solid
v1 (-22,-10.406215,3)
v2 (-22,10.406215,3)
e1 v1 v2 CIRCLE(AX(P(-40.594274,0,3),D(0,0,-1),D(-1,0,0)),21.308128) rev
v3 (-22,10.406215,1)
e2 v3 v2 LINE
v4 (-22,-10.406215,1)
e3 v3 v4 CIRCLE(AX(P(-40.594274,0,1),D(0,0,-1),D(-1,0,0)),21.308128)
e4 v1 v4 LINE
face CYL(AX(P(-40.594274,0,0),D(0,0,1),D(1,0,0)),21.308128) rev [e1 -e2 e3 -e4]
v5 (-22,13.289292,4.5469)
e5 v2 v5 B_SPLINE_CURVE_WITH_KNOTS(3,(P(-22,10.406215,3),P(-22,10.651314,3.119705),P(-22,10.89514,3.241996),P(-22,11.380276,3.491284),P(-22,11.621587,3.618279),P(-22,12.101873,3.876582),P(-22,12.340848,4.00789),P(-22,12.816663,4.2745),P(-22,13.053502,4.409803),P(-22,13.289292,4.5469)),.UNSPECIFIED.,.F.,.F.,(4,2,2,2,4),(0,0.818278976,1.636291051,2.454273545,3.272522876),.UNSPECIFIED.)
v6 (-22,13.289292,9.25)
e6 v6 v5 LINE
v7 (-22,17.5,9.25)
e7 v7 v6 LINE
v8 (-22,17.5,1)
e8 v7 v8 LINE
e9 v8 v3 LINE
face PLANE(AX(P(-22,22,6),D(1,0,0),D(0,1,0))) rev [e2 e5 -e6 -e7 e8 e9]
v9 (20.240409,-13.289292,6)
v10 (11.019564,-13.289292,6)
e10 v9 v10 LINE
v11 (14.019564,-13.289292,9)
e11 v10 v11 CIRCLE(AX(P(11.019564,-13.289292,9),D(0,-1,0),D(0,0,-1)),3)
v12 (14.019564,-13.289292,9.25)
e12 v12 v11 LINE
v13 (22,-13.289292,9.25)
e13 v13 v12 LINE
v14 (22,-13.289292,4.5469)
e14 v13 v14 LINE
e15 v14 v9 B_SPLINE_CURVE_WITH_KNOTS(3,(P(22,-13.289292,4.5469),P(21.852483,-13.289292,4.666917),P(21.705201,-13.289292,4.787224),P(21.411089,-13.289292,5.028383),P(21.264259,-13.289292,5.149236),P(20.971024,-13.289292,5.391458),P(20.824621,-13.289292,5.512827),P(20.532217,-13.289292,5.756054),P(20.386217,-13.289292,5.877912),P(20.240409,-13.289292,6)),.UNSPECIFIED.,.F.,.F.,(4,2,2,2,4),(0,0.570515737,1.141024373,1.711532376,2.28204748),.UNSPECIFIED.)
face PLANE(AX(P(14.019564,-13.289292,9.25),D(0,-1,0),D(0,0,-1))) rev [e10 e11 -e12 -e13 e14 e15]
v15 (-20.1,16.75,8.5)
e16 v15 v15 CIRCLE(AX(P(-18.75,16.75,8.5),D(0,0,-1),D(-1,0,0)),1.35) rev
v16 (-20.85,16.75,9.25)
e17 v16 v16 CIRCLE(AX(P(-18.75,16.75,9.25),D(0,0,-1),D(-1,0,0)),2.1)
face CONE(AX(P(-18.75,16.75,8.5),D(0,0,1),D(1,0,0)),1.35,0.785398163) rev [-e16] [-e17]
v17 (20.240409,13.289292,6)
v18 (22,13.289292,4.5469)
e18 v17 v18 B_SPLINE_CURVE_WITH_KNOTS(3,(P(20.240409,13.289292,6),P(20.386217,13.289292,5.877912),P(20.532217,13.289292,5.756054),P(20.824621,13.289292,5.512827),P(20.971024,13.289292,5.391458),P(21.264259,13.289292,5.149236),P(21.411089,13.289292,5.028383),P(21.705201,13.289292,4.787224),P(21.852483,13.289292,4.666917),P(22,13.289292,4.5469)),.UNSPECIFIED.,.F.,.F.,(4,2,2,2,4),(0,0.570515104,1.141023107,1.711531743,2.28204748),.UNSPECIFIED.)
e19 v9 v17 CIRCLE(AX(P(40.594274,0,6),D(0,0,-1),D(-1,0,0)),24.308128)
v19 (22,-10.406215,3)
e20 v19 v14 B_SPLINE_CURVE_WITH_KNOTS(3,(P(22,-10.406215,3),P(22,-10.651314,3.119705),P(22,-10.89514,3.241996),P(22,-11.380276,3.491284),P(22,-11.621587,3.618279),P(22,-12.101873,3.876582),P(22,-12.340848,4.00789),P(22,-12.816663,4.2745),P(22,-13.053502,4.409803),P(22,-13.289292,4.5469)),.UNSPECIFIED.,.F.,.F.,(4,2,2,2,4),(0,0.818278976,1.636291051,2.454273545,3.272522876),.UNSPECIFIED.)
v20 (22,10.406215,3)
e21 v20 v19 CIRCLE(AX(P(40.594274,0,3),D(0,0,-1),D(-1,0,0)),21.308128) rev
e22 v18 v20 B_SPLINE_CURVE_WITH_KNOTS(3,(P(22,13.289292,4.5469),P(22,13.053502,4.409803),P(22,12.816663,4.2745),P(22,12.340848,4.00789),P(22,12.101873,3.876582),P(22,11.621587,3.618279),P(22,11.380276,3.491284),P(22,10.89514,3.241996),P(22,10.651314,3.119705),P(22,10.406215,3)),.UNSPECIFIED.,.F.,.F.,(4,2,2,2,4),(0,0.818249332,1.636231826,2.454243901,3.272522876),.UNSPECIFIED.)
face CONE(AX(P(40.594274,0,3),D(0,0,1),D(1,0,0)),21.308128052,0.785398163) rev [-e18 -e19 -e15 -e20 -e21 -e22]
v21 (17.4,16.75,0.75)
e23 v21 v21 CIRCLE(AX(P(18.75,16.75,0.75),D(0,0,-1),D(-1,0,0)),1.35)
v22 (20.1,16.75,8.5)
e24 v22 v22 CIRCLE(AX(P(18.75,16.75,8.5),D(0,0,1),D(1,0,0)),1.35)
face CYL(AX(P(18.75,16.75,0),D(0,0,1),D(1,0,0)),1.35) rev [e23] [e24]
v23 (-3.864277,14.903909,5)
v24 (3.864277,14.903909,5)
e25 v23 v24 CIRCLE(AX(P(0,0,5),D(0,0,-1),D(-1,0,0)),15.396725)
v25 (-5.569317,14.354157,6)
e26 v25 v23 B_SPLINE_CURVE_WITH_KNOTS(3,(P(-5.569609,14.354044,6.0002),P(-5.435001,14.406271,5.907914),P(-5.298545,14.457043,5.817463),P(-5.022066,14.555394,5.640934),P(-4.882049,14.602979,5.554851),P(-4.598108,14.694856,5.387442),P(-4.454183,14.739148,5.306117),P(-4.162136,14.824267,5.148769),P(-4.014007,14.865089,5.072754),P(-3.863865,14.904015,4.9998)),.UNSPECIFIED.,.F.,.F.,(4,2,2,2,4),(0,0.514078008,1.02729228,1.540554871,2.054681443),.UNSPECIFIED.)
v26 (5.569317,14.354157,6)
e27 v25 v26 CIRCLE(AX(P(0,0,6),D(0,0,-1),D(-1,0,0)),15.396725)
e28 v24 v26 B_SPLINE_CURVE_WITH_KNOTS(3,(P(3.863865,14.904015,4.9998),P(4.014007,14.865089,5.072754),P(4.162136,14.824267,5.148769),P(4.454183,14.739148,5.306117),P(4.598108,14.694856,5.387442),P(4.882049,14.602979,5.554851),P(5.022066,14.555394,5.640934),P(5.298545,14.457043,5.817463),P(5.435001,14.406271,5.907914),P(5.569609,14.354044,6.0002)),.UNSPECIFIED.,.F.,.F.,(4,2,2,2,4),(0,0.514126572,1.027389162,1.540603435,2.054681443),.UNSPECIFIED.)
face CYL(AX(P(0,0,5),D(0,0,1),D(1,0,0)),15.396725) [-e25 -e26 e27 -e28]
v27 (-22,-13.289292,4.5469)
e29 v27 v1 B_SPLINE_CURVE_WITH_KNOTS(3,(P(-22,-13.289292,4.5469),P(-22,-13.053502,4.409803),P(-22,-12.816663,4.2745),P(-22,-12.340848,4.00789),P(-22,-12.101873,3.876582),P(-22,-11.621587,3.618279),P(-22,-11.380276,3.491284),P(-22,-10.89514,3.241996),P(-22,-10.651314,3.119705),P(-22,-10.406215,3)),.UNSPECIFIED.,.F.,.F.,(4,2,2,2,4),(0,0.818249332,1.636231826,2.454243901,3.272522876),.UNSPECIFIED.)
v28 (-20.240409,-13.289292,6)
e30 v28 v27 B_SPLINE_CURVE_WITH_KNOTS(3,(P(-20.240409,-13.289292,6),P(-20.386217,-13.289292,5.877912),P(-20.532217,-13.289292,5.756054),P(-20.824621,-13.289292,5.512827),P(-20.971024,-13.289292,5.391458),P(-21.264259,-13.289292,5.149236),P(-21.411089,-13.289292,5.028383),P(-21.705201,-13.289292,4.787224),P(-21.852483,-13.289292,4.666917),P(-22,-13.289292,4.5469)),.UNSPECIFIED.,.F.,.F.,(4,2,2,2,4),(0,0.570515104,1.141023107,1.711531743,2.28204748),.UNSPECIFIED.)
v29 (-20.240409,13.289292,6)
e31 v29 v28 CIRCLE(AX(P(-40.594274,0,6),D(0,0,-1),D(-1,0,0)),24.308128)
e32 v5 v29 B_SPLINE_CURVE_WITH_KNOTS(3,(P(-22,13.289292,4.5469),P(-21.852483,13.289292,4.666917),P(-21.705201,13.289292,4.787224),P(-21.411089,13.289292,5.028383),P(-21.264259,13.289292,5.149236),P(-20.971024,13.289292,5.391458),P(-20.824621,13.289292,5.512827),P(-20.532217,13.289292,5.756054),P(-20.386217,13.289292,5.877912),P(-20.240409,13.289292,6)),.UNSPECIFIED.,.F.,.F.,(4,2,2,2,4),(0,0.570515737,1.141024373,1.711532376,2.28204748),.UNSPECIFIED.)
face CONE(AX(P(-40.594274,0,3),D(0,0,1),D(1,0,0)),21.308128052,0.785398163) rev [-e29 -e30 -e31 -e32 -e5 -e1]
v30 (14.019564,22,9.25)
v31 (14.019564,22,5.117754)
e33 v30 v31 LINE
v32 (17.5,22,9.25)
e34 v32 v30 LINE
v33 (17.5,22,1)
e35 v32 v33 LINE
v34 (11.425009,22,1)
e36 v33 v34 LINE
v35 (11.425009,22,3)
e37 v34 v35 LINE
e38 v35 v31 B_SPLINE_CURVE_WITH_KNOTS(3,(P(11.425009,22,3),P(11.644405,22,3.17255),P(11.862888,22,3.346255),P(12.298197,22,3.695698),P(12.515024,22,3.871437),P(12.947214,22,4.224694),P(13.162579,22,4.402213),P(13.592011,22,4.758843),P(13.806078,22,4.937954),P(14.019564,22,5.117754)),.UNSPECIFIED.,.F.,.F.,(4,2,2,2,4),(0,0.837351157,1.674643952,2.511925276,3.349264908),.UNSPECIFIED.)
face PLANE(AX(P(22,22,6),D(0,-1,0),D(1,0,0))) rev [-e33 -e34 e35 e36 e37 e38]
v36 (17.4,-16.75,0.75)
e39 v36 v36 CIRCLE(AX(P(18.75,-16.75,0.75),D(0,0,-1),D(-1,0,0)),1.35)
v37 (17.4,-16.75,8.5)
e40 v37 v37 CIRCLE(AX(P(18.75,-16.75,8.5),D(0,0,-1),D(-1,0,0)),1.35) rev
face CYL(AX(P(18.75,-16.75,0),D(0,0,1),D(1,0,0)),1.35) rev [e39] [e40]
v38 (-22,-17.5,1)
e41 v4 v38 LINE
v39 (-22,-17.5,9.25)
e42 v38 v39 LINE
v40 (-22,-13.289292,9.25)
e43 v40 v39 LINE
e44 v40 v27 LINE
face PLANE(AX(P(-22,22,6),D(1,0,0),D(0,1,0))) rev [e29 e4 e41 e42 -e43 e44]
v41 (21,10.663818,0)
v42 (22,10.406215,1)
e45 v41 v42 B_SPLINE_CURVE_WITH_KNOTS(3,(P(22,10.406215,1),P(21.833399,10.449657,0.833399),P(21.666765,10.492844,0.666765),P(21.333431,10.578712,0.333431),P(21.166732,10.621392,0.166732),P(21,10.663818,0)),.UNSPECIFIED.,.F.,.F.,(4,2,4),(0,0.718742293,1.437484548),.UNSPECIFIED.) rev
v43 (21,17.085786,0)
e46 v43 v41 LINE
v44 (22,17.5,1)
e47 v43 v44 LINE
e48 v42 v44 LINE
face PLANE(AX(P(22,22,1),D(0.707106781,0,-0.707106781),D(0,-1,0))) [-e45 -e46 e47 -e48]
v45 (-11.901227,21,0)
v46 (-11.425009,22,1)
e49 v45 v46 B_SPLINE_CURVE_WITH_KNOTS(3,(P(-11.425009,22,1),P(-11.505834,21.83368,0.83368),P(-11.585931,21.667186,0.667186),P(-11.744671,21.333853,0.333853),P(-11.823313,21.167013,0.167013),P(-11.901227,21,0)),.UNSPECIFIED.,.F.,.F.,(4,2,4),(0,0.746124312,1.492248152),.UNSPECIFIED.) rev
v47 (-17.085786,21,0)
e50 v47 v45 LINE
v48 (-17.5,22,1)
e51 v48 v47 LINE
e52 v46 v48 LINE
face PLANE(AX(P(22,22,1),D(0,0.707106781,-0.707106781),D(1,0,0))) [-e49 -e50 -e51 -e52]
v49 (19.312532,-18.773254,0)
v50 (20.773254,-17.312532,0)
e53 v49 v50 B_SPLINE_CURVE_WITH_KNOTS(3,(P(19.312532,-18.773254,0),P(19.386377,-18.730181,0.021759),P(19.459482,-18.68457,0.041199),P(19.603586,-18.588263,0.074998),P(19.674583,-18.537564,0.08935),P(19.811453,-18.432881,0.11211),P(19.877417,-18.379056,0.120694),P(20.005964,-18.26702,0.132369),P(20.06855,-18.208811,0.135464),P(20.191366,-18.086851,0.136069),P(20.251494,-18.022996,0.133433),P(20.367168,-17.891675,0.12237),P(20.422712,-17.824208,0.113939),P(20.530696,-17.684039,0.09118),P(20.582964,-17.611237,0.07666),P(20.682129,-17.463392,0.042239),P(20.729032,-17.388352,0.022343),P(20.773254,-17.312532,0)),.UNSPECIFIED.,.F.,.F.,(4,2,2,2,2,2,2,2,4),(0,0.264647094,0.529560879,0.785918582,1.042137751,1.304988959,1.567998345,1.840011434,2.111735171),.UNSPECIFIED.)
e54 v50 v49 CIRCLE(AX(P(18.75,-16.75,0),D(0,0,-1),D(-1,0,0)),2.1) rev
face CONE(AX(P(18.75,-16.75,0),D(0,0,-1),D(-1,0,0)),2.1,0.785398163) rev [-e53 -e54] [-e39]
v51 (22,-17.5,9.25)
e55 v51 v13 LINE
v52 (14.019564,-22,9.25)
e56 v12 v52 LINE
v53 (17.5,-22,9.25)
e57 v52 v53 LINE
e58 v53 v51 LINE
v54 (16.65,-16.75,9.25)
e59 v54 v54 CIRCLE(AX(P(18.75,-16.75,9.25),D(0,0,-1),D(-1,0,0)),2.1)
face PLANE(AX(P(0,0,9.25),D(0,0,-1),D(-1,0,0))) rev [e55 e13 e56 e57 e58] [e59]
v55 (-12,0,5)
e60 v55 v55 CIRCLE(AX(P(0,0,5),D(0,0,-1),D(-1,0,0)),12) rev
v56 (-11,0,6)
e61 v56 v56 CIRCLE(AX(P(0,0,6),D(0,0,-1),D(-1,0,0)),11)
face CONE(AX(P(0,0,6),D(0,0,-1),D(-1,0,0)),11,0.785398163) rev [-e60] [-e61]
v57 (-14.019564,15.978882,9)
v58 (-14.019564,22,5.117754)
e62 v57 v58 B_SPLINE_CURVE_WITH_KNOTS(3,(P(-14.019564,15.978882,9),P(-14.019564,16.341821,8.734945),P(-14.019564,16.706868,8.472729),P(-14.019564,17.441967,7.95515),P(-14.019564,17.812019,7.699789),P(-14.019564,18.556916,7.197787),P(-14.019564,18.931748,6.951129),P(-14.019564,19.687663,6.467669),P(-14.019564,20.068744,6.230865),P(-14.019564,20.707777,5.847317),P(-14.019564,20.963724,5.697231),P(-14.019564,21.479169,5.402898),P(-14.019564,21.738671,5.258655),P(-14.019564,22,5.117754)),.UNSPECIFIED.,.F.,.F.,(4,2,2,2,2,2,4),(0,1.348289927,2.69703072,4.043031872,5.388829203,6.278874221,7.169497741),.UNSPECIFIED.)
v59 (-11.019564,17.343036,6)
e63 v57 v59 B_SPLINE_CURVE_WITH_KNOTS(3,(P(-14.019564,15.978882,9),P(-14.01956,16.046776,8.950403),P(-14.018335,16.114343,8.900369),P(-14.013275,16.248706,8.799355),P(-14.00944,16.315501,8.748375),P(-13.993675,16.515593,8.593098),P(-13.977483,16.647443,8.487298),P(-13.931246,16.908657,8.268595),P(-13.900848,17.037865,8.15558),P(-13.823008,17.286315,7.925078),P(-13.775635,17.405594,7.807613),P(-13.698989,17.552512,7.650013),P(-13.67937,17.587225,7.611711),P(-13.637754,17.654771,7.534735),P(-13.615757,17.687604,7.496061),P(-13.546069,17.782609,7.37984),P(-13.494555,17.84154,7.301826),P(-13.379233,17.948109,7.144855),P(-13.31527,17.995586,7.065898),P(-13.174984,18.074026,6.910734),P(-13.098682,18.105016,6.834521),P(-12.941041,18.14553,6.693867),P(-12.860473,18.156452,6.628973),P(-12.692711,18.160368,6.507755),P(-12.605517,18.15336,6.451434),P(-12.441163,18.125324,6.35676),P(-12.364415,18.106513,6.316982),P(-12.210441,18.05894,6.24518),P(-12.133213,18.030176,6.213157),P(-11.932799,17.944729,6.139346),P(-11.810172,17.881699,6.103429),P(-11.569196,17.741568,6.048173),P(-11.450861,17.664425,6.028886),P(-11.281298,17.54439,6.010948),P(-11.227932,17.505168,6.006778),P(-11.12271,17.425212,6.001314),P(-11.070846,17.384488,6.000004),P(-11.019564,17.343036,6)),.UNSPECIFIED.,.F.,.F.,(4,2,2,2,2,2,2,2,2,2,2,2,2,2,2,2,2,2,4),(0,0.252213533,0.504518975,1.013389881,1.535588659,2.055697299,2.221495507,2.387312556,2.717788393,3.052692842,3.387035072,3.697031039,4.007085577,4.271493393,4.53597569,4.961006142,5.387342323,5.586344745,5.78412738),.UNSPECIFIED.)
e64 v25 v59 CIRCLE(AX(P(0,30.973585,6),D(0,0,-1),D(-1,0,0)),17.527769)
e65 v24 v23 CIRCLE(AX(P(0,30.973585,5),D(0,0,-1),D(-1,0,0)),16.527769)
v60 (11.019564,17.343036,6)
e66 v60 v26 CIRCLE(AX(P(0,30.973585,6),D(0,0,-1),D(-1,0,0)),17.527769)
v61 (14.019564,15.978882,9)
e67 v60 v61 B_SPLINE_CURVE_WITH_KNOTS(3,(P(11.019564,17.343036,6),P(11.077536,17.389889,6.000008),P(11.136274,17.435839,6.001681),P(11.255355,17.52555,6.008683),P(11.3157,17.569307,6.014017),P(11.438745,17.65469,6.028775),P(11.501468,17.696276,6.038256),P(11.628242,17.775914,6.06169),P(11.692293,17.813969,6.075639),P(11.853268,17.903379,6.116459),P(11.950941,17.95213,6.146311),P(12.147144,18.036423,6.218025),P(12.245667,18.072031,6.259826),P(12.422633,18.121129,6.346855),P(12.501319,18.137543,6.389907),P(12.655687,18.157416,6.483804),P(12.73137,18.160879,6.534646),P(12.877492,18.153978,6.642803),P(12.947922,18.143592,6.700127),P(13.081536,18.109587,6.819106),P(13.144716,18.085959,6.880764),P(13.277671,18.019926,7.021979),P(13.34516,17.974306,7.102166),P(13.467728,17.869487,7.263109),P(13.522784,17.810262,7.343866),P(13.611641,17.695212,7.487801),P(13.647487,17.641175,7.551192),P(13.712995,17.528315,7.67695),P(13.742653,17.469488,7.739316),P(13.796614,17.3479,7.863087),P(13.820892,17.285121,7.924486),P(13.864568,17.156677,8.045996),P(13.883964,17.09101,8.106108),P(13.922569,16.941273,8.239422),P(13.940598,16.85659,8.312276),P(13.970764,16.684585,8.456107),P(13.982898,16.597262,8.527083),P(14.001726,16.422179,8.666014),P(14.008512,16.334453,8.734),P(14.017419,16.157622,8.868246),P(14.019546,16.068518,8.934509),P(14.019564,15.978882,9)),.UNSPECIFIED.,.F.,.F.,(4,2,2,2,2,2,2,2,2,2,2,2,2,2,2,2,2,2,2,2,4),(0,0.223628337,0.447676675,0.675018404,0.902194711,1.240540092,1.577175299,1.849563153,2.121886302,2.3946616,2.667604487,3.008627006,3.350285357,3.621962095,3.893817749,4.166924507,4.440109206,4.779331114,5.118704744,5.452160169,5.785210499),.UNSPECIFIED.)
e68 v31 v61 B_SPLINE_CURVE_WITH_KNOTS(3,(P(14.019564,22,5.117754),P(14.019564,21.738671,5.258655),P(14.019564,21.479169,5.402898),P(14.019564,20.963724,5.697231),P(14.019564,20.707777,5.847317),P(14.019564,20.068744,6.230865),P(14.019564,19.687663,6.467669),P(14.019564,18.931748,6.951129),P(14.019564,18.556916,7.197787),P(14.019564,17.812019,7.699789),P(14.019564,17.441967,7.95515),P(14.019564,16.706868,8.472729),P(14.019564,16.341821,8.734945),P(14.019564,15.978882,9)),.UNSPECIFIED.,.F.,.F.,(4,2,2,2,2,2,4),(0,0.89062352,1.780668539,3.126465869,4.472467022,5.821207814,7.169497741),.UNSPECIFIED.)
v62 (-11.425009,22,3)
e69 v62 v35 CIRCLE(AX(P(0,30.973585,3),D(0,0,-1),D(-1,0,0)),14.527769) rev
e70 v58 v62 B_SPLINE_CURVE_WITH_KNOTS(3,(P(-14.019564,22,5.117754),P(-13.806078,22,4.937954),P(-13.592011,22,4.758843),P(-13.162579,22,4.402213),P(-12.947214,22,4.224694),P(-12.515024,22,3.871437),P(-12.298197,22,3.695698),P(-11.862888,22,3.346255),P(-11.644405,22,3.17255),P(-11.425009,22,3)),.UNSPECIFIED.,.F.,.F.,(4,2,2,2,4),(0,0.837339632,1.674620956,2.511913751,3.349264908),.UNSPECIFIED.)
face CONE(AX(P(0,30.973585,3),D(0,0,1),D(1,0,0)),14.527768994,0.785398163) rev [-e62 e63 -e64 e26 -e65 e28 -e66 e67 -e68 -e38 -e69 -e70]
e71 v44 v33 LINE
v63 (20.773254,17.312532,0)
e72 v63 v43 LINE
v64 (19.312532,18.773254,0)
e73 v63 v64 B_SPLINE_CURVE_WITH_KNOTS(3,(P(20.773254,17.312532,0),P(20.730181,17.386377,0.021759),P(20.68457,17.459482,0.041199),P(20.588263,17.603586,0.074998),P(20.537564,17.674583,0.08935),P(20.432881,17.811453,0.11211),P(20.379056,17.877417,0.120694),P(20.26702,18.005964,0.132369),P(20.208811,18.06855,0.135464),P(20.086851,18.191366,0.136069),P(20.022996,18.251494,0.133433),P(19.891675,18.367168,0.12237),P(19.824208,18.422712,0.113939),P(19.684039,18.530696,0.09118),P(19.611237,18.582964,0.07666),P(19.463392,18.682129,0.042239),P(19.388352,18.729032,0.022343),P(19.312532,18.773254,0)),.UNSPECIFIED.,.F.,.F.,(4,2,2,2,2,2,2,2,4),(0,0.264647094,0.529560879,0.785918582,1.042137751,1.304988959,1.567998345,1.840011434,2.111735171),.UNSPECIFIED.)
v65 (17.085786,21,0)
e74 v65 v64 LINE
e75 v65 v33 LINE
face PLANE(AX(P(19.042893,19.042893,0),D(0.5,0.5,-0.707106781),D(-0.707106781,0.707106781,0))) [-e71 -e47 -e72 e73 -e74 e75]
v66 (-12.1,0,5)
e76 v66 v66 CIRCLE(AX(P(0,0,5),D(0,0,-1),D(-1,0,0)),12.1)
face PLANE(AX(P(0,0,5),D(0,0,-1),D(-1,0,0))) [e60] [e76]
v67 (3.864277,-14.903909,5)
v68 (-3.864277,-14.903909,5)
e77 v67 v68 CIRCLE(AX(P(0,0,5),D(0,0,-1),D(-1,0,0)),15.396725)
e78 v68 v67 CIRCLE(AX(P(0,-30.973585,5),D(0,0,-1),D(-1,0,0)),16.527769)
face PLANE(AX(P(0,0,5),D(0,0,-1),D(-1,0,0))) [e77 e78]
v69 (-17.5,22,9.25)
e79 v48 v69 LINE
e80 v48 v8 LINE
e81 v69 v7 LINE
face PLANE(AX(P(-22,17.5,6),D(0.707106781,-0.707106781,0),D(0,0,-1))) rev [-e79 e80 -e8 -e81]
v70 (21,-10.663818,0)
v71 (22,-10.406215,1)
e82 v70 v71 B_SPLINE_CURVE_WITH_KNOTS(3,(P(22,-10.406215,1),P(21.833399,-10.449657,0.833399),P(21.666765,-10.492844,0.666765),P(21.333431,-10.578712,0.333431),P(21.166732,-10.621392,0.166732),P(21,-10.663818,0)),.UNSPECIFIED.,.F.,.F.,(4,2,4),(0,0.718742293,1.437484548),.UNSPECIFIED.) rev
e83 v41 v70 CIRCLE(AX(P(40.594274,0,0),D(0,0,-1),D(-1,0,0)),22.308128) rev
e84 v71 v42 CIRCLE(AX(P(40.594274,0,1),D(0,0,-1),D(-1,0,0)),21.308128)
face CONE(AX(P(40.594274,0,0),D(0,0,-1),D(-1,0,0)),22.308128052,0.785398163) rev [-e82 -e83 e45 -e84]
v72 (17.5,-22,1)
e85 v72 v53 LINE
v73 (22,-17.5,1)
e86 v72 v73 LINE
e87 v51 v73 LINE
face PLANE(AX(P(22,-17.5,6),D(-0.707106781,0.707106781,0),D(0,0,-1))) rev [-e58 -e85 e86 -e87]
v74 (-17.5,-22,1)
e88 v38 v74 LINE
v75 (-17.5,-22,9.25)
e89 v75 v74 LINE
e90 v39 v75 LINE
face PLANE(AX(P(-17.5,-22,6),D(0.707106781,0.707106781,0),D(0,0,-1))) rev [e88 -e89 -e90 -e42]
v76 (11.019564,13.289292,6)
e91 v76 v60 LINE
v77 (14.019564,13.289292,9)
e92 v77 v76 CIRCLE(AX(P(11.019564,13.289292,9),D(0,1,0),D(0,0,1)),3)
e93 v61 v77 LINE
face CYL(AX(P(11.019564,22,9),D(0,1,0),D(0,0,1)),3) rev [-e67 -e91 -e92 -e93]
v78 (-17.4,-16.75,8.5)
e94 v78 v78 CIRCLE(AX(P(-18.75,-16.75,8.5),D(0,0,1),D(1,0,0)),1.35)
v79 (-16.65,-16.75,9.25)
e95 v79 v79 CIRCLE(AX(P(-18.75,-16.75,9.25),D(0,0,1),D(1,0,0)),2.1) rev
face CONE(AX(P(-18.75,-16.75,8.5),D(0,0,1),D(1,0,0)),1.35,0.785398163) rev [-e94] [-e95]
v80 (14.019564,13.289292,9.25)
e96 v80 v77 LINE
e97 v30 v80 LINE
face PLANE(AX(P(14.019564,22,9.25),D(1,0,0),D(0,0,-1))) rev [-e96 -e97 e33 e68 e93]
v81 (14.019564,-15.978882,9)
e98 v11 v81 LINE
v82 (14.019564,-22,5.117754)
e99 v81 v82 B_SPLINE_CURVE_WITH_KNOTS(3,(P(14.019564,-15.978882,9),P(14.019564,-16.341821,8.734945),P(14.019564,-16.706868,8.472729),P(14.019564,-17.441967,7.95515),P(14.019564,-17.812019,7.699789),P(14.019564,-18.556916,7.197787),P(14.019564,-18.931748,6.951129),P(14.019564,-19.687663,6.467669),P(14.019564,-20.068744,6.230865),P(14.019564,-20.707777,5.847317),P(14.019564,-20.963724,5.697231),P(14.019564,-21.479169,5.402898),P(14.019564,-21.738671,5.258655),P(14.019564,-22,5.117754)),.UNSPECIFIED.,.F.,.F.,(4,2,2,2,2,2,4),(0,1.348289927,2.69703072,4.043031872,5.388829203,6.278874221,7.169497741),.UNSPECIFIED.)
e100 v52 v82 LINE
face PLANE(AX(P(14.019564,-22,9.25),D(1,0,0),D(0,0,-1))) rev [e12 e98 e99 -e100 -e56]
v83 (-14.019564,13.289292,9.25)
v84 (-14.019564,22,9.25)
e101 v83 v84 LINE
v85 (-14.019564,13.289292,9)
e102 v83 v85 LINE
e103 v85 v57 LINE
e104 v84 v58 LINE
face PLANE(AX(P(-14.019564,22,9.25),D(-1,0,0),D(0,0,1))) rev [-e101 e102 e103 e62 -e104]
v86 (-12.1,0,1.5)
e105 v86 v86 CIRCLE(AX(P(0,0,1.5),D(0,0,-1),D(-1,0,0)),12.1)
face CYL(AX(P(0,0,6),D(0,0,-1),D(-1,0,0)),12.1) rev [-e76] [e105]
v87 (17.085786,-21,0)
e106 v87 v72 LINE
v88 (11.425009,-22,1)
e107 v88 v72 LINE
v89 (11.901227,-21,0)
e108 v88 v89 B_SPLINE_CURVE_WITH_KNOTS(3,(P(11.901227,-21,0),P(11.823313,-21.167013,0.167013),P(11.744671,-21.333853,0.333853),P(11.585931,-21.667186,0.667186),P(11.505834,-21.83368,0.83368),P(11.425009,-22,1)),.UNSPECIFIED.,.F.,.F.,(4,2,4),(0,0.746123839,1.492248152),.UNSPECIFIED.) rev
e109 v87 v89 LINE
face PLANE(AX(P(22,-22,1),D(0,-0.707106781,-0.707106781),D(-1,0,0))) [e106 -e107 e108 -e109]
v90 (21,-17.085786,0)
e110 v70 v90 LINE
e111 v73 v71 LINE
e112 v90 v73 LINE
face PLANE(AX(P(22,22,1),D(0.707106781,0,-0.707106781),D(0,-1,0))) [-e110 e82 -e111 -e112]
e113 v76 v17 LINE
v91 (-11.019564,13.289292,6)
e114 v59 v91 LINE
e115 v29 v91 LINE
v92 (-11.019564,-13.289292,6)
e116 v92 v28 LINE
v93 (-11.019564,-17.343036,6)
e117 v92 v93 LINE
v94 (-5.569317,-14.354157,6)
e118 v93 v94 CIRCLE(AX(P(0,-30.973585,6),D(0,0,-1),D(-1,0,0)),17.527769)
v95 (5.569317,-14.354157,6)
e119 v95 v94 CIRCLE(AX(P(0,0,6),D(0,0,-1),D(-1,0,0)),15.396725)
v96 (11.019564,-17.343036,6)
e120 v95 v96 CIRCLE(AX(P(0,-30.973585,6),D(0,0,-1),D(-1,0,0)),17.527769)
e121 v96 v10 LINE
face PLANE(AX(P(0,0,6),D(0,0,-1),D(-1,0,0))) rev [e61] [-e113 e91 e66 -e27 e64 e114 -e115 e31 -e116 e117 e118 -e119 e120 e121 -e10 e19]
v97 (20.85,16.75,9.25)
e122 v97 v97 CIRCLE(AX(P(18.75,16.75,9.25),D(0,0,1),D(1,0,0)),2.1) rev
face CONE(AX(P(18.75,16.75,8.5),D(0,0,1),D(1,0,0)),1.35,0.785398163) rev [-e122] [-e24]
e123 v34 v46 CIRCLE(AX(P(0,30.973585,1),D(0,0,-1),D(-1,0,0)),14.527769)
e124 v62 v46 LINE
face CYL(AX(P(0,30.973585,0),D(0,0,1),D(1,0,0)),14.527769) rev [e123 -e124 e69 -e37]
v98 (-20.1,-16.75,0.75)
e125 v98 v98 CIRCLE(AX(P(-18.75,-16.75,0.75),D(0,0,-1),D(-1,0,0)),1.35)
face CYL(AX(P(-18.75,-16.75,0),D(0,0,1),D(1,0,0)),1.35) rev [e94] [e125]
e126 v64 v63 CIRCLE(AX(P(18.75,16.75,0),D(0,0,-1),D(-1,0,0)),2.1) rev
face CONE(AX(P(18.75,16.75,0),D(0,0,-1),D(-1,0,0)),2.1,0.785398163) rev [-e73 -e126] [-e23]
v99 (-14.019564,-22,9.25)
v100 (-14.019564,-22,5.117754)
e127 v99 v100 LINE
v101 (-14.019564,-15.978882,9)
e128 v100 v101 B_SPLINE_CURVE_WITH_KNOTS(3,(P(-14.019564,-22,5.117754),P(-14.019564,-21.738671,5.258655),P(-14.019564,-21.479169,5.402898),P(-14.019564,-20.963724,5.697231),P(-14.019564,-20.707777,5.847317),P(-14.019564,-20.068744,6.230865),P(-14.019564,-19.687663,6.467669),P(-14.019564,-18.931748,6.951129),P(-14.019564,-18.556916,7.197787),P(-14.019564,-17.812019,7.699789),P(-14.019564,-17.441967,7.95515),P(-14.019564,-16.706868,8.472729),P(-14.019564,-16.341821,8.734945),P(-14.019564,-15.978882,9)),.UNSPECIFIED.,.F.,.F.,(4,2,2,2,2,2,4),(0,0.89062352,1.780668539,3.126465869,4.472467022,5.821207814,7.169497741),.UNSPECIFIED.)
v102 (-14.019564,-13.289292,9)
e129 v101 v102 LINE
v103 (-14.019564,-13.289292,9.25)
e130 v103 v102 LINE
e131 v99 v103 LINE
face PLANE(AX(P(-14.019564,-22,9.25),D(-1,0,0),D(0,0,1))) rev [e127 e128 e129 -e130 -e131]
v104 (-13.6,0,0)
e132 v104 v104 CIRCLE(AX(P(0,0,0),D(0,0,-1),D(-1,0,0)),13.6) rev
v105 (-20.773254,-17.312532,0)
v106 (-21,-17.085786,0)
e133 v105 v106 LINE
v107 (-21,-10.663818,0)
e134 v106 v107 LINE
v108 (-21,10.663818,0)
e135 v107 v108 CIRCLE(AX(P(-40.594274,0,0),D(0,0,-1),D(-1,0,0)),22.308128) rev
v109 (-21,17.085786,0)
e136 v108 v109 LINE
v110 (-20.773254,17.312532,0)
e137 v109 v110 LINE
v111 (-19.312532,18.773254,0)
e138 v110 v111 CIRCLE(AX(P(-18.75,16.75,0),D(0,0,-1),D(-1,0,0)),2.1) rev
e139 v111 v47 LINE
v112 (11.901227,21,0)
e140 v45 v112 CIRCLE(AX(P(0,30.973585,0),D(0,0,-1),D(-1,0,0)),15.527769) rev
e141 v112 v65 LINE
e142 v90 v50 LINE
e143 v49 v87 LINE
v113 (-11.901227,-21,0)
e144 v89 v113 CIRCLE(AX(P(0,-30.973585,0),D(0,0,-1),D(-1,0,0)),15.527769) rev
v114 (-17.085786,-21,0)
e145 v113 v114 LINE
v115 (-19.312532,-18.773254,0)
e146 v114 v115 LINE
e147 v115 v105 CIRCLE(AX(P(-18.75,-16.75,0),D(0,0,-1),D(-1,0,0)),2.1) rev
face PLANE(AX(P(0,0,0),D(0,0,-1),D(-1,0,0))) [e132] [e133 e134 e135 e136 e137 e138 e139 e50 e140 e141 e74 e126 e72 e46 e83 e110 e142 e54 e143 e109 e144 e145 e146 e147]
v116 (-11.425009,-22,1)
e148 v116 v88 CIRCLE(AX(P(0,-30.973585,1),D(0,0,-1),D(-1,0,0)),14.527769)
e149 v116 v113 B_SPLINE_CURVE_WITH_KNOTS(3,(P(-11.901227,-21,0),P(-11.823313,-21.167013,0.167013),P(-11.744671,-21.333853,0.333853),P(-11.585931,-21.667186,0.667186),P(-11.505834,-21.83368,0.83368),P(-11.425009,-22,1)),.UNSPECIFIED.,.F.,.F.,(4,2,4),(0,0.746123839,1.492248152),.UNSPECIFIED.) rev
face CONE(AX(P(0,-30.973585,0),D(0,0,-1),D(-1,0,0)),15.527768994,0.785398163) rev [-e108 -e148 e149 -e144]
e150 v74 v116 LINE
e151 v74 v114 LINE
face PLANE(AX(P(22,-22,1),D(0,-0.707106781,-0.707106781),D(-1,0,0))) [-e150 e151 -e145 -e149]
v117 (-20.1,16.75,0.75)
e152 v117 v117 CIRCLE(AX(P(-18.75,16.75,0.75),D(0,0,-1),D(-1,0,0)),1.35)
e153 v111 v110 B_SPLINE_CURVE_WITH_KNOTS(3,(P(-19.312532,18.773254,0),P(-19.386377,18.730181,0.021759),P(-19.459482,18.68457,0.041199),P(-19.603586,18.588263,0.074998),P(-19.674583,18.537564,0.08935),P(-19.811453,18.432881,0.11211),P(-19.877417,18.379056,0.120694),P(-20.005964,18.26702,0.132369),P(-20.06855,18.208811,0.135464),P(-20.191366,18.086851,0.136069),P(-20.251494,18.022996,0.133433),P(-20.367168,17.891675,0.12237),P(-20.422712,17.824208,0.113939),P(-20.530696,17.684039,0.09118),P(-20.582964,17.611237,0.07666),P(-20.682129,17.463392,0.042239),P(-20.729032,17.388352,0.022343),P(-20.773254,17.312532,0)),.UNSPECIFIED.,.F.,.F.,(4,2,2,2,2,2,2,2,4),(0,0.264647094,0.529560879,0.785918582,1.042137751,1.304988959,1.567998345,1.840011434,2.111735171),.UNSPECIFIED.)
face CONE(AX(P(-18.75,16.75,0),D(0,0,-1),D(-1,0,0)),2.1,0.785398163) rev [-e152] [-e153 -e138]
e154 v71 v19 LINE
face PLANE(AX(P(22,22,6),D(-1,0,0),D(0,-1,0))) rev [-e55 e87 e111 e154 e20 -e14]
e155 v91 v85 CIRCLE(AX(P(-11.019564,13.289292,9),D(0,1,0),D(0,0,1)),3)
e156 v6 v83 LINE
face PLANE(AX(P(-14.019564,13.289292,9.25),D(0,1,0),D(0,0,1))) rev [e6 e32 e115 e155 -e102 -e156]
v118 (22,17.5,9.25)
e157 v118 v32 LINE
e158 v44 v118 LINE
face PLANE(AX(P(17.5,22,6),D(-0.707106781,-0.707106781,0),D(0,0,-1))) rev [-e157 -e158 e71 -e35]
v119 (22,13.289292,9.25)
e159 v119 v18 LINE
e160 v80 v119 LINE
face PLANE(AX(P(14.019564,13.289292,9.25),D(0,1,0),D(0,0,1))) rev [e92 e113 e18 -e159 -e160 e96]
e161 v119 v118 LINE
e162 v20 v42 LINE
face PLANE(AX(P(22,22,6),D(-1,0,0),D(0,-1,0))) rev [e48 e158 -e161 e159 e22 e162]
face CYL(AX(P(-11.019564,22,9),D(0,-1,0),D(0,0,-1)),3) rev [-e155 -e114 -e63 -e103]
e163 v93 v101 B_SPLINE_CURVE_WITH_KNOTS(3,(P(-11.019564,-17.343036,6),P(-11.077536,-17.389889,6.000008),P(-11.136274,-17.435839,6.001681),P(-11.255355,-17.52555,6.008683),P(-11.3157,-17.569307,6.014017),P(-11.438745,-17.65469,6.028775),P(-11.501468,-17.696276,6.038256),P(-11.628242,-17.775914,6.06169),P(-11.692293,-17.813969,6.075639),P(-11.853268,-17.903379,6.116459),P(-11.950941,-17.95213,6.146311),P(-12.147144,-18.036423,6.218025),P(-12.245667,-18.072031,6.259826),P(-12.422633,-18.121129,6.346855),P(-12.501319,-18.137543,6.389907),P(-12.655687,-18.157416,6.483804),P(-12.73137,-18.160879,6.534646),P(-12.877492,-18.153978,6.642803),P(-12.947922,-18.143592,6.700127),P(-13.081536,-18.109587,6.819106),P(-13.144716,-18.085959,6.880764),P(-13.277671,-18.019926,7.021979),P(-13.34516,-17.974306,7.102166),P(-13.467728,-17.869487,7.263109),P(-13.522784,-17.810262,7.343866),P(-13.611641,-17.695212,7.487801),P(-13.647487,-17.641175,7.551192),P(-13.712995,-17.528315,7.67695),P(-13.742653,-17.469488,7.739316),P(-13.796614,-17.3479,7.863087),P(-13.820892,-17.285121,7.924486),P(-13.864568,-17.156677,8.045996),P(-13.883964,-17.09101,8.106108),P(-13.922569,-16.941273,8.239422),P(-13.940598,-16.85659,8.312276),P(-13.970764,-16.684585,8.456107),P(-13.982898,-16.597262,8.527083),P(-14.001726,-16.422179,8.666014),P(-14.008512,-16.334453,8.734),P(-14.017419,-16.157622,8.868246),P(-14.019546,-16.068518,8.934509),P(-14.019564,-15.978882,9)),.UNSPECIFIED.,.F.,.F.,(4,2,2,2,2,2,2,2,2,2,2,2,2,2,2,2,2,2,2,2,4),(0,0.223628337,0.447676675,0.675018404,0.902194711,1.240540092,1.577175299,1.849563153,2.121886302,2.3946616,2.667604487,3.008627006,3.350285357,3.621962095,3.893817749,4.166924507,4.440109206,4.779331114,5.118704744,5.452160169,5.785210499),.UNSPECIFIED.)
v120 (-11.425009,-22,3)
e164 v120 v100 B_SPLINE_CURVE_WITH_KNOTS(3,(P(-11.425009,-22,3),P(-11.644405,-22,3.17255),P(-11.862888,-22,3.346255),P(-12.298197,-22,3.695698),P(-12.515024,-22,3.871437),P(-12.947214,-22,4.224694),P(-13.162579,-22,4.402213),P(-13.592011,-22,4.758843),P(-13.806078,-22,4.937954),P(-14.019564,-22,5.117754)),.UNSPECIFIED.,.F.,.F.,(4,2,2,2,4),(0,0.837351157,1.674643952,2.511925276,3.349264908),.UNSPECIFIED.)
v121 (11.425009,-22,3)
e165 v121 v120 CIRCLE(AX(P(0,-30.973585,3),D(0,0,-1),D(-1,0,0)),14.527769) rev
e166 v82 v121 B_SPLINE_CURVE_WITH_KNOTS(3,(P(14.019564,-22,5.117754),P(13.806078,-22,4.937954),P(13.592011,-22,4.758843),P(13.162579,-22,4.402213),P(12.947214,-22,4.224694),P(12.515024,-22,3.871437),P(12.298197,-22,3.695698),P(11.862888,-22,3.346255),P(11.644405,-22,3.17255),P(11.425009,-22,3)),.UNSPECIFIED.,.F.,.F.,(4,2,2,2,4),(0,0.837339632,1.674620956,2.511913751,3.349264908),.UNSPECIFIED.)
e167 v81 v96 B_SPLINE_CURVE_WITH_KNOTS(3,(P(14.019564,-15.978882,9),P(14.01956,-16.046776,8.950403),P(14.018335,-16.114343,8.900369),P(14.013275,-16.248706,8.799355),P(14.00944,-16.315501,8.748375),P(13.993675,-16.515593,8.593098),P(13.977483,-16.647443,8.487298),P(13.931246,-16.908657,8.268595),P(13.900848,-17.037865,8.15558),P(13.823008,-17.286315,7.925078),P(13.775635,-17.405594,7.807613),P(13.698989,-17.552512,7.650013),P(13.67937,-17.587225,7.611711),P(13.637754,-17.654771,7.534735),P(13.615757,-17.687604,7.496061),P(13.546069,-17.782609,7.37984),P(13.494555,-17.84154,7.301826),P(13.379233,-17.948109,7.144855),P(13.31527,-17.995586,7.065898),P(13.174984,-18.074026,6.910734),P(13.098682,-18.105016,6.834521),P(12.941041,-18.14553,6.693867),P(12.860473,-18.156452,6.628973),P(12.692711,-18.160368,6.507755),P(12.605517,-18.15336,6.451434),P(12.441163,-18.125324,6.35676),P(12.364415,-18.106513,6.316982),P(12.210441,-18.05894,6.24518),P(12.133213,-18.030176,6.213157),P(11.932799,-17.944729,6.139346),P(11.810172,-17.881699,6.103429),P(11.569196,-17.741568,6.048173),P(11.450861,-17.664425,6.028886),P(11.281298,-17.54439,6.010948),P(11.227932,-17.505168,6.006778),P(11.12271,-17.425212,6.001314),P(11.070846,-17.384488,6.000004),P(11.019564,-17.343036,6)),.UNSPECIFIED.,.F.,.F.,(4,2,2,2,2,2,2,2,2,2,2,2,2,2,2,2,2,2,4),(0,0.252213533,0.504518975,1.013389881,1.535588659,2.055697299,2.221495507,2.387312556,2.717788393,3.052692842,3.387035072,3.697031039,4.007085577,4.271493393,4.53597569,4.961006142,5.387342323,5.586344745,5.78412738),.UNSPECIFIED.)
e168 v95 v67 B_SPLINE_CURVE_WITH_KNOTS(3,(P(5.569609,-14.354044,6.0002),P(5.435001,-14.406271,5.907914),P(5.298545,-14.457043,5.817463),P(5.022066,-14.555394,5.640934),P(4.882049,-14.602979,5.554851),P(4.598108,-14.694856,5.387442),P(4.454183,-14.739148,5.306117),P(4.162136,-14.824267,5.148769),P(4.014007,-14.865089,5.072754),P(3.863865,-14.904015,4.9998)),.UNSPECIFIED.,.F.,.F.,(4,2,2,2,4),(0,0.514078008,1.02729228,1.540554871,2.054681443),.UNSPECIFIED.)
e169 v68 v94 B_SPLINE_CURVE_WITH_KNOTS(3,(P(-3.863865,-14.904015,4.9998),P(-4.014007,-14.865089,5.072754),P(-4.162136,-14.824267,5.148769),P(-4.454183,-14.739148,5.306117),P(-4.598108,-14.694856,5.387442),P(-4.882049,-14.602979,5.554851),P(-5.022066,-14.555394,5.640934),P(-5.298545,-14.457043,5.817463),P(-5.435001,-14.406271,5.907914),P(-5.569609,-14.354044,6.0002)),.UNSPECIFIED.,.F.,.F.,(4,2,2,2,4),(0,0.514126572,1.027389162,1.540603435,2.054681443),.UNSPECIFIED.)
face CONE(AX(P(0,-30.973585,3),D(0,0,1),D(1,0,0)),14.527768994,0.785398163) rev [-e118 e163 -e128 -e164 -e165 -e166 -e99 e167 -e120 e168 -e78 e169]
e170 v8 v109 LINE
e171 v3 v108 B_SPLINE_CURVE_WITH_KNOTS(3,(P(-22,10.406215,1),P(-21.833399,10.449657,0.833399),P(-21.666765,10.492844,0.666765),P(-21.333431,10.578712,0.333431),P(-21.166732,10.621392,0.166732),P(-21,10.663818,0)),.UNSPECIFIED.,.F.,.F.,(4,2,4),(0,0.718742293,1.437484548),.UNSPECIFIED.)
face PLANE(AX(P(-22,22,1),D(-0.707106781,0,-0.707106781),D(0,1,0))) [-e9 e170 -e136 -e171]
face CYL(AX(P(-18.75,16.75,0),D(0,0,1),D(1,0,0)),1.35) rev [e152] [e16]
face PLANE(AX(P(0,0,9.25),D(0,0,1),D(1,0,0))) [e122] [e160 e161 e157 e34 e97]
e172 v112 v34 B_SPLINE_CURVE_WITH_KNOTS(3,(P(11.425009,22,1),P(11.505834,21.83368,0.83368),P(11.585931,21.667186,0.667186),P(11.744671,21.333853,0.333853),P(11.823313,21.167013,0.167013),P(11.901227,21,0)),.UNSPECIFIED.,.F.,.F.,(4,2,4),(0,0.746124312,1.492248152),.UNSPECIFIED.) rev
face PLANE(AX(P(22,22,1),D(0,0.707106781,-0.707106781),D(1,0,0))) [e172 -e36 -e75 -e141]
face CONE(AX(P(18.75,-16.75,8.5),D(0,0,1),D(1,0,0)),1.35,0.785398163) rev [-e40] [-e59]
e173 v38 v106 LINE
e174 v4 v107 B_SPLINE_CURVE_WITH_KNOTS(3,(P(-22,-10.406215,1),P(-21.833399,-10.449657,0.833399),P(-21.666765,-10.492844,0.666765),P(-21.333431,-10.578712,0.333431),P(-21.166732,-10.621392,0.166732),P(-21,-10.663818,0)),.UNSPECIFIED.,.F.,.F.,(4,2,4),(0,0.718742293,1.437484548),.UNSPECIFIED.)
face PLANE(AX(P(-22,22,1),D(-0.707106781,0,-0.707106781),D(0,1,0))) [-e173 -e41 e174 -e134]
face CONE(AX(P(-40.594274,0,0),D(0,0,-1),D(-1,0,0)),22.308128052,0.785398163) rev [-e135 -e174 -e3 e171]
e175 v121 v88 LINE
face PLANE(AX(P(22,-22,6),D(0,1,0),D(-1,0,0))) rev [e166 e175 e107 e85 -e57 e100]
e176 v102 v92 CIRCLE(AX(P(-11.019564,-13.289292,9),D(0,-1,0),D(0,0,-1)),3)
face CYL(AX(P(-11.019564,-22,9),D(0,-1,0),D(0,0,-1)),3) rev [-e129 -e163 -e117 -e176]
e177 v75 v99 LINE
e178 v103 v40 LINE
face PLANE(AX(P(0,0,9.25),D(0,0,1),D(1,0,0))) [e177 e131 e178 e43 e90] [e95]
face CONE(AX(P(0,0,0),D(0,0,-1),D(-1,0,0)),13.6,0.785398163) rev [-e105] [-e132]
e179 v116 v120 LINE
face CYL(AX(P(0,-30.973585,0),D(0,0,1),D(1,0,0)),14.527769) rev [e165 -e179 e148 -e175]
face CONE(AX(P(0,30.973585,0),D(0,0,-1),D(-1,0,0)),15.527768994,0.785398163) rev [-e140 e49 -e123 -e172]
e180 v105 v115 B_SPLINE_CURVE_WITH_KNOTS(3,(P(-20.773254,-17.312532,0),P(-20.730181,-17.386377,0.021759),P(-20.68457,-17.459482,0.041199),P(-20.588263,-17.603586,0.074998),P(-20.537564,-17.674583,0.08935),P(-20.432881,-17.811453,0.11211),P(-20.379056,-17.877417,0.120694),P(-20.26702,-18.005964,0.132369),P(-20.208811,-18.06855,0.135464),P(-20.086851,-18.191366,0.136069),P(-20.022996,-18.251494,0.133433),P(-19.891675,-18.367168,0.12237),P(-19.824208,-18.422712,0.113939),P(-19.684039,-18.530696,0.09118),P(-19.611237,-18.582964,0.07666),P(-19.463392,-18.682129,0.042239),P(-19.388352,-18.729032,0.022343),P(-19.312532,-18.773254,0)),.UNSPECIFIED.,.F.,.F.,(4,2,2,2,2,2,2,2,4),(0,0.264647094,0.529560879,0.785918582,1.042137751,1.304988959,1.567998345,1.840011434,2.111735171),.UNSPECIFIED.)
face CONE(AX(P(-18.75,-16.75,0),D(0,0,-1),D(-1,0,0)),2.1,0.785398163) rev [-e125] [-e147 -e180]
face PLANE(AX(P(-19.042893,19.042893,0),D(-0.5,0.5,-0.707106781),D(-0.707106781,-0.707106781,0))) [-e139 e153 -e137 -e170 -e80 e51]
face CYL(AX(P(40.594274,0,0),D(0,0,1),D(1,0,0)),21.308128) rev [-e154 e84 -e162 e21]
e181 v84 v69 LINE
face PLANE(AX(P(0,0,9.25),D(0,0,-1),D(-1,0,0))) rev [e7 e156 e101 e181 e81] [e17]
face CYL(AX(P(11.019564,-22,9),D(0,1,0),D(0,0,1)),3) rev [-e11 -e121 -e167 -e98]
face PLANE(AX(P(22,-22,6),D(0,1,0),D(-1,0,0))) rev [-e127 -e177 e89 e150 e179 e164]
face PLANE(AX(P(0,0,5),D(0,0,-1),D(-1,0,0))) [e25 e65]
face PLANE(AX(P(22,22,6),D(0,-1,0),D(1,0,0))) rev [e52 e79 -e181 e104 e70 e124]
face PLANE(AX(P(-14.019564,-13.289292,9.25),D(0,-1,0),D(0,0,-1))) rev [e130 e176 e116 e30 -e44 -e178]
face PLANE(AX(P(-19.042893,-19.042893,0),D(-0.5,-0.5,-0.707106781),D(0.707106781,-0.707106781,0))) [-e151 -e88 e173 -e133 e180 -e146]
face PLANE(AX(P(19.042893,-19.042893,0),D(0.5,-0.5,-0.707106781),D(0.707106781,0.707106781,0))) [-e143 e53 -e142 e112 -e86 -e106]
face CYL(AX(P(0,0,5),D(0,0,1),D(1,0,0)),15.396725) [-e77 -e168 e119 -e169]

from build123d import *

# Parameters (mm, degrees)
CROQUIS1_W              = 44
CROQUIS1_H              = 44
CROQUIS1_R              = 12.1
SALIENTE_EXTRUIR1_DEPTH = 6
CHAFL_N2_SIZE           = 4.5
CROQUIS2_R              = 1.35
CORTAR_EXTRUIR1_DEPTH   = 32.685959036
CROQUIS3_R              = 21.308128052
CORTAR_EXTRUIR2_DEPTH   = 32.685959036
CHAFL_N4_SIZE           = 1
SALIENTE_EXTRUIR2_START = 3.25
CROQUIS4_R              = 1.35
SALIENTE_EXTRUIR2_DEPTH = 3.25
CHAFL_N5_SIZE           = 3
CHAFL_N3_SIZE           = 0.75
REDONDEO1_R             = 3
CROQUIS5_R              = 15.396724601
CROQUIS5_R_2            = 11
SALIENTE_EXTRUIR4_DEPTH = 1
CHAFL_N6_SIZE           = 1.5
CHAFL_N7_SIZE           = 1


# Some blends are built 0.0001 mm under size
with BuildPart() as part:
    # Croquis1 → Saliente-Extruir1 (new body)
    with BuildSketch(Plane.XY):
        Rectangle(CROQUIS1_W, CROQUIS1_H)
        Circle(CROQUIS1_R, mode=Mode.SUBTRACT)
    extrude(amount=SALIENTE_EXTRUIR1_DEPTH)

    # Chaflán2
    chafl_n2_edges = [part.edges().sort_by_distance(p)[0] for p in [
        (-22, 22, 3),
        (22, 22, 3),
        (22, -22, 3),
        (-22, -22, 3),
    ]]
    chamfer(chafl_n2_edges, length=CHAFL_N2_SIZE)

    # Croquis2 → Cortar-Extruir1 (cut, through all)
    with BuildSketch(Plane.XY.offset(6)):
        with Locations((-18.75, -16.75)):
            Circle(CROQUIS2_R)
        with Locations((18.75, -16.75)):
            Circle(CROQUIS2_R)
        with Locations((18.75, 16.75)):
            Circle(CROQUIS2_R)
        with Locations((-18.75, 16.75)):
            Circle(CROQUIS2_R)
    extrude(amount=-CORTAR_EXTRUIR1_DEPTH, mode=Mode.SUBTRACT)

    # Croquis3 → Cortar-Extruir2 (cut, through all)
    with BuildSketch(Plane.XY.offset(6)):
        with Locations((40.594273769, 0)):
            Circle(CROQUIS3_R)
        with Locations((-40.594273769, 0)):
            Circle(CROQUIS3_R)
        with BuildLine():
            Line((14.527768994, 48.750256971), (14.527768994, 30.973585325))
            ThreePointArc((14.527768994, 30.973585325), (0, 16.445816331), (-14.527768994, 30.973585325))
            Line((-14.527768994, 30.973585325), (-14.527768994, 48.750256971))
            ThreePointArc((-14.527768994, 48.750256971), (0, 63.278025965), (14.527768994, 48.750256971))
        make_face()
        with BuildLine():
            Line((14.527768994, -48.750256971), (14.527768994, -30.973585325))
            ThreePointArc((14.527768994, -30.973585325), (0, -16.445816331), (-14.527768994, -30.973585325))
            Line((-14.527768994, -30.973585325), (-14.527768994, -48.750256971))
            ThreePointArc((-14.527768994, -48.750256971), (0, -63.278025965), (14.527768994, -48.750256971))
        make_face()
    extrude(amount=-CORTAR_EXTRUIR2_DEPTH, mode=Mode.SUBTRACT)

    # Chaflán4
    chafl_n4_edges = [part.edges().sort_by_distance(p)[0] for p in [
        (-22, 13.953107343, 0),
        (14.462504669, 22, 0),
        (22, -13.953107343, 0),
        (-14.462504669, -22, 0),
        (19.75, -19.75, 0),
        (-19.75, -19.75, 0),
        (19.75, 19.75, 0),
        (-19.75, 19.75, 0),
        (-14.462504669, 22, 0),
        (22, 13.953107343, 0),
        (14.462504669, -22, 0),
        (-22, -13.953107343, 0),
        (19.286145717, 0, 0),
        (0, -16.445816331, 0),
        (0, 16.445816331, 0),
        (-19.286145717, 0, 0),
    ]]
    chamfer(chafl_n4_edges, length=CHAFL_N4_SIZE)

    # Croquis4 → Saliente-Extruir2 (add)
    # profile 1 of 4: a face of its own
    with BuildSketch(Plane.XY.offset(6).offset(SALIENTE_EXTRUIR2_START)):
        Polygon((-22, -17.5), (-17.5, -22), (-14.019564426, -22), (-14.019564426, -13.289292173), (-22, -13.289292173), align=None)
        with Locations((-18.75, -16.75)):
            Circle(CROQUIS4_R, mode=Mode.SUBTRACT)
    # profile 2 of 4: a face of its own
    with BuildSketch(Plane.XY.offset(6).offset(SALIENTE_EXTRUIR2_START)):
        Polygon((22, -13.289292173), (22, -17.5), (17.5, -22), (14.019564426, -22), (14.019564426, -13.289292173), align=None)
        with Locations((18.75, -16.75)):
            Circle(CROQUIS4_R, mode=Mode.SUBTRACT)
    # profile 3 of 4: a face of its own
    with BuildSketch(Plane.XY.offset(6).offset(SALIENTE_EXTRUIR2_START)):
        Polygon((22, 17.5), (17.5, 22), (14.019564426, 22), (14.019564426, 13.289292173), (22, 13.289292173), align=None)
        with Locations((18.75, 16.75)):
            Circle(CROQUIS4_R, mode=Mode.SUBTRACT)
    # profile 4 of 4: a face of its own
    with BuildSketch(Plane.XY.offset(6).offset(SALIENTE_EXTRUIR2_START)):
        Polygon((-22, 13.289292173), (-22, 17.5), (-17.5, 22), (-14.019564426, 22), (-14.019564426, 13.289292173), align=None)
        with Locations((-18.75, 16.75)):
            Circle(CROQUIS4_R, mode=Mode.SUBTRACT)
    extrude(amount=-SALIENTE_EXTRUIR2_DEPTH)

    # Chaflán5
    chafl_n5_edges = [part.edges().sort_by_distance(p)[0] for p in [
        (-19.286145717, 0, 6),
        (19.286145717, 0, 6),
        (0, -16.445816331, 6),
        (0, 16.445816331, 6),
    ]]
    chamfer(chafl_n5_edges, length=CHAFL_N5_SIZE)

    # Chaflán3
    # the kernel refuses this chamfer: 0.75 mm, written as the material it takes off along each edge
    with BuildSketch(Plane(origin=(-18.75, -16.75, 9.25), x_dir=(1, 0, 0), z_dir=(0, -1, 0))) as chafl_n3_piece_1:
        Polygon((1.35, -CHAFL_N3_SIZE), (1.35 + CHAFL_N3_SIZE, 0), (1.35, 0), align=None)
    revolve(axis=Axis((-18.75, -16.75, 9.25), (0, 0, 1)), mode=Mode.SUBTRACT)
    with BuildSketch(Plane(origin=(18.75, -16.75, 9.25), x_dir=(1, 0, 0), z_dir=(0, -1, 0))) as chafl_n3_piece_2:
        Polygon((1.35, -CHAFL_N3_SIZE), (1.35 + CHAFL_N3_SIZE, 0), (1.35, 0), align=None)
    revolve(axis=Axis((18.75, -16.75, 9.25), (0, 0, 1)), mode=Mode.SUBTRACT)
    with BuildSketch(Plane(origin=(18.75, 16.75, 9.25), x_dir=(1, 0, 0), z_dir=(0, -1, 0))) as chafl_n3_piece_3:
        Polygon((1.35 + CHAFL_N3_SIZE, 0), (1.35, -CHAFL_N3_SIZE), (1.35, 0), align=None)
    revolve(axis=Axis((18.75, 16.75, 9.25), (0, 0, 1)), mode=Mode.SUBTRACT)
    with BuildSketch(Plane(origin=(-18.75, 16.75, 9.25), x_dir=(1, 0, 0), z_dir=(0, -1, 0))) as chafl_n3_piece_4:
        Polygon((1.35 + CHAFL_N3_SIZE, 0), (1.35, -CHAFL_N3_SIZE), (1.35, 0), align=None)
    revolve(axis=Axis((-18.75, 16.75, 9.25), (0, 0, 1)), mode=Mode.SUBTRACT)
    with BuildSketch(Plane(origin=(-18.75, 16.75, 0), x_dir=(1, 0, 0), z_dir=(0, -1, 0))) as chafl_n3_piece_5:
        Polygon((1.35 + CHAFL_N3_SIZE, 0), (1.35, CHAFL_N3_SIZE), (1.35, 0), align=None)
    revolve(axis=Axis((-18.75, 16.75, 0), (0, 0, 1)), mode=Mode.SUBTRACT)
    with BuildSketch(Plane(origin=(18.75, 16.75, 0), x_dir=(1, 0, 0), z_dir=(0, -1, 0))) as chafl_n3_piece_6:
        Polygon((1.35 + CHAFL_N3_SIZE, 0), (1.35, CHAFL_N3_SIZE), (1.35, 0), align=None)
    revolve(axis=Axis((18.75, 16.75, 0), (0, 0, 1)), mode=Mode.SUBTRACT)
    with BuildSketch(Plane(origin=(18.75, -16.75, 0), x_dir=(1, 0, 0), z_dir=(0, -1, 0))) as chafl_n3_piece_7:
        Polygon((1.35 + CHAFL_N3_SIZE, 0), (1.35, CHAFL_N3_SIZE), (1.35, 0), align=None)
    revolve(axis=Axis((18.75, -16.75, 0), (0, 0, 1)), mode=Mode.SUBTRACT)
    with BuildSketch(Plane(origin=(-18.75, -16.75, 0), x_dir=(1, 0, 0), z_dir=(0, -1, 0))) as chafl_n3_piece_8:
        Polygon((1.35 + CHAFL_N3_SIZE, 0), (1.35, CHAFL_N3_SIZE), (1.35, 0), align=None)
    revolve(axis=Axis((-18.75, -16.75, 0), (0, 0, 1)), mode=Mode.SUBTRACT)

    # Redondeo1
    redondeo1_edges = [part.edges().sort_by_distance(p)[0] for p in [
        (14.019564426, -16.871341335, 6),
        (-14.019564426, 16.871341335, 6),
        (-14.019564426, -16.871341335, 6),
        (14.019564426, 16.871341335, 6),
    ]]
    fillet(redondeo1_edges, radius=REDONDEO1_R)

    # Croquis5 → Saliente-Extruir4 (add)
    with BuildSketch(Plane(origin=(0, 0, 6), x_dir=(-1, 0, 0), z_dir=(0, 0, -1))):
        Circle(CROQUIS5_R)
        Circle(CROQUIS5_R_2, mode=Mode.SUBTRACT)
    extrude(amount=SALIENTE_EXTRUIR4_DEPTH)

    # Chaflán6
    chafl_n6_edges = [part.edges().sort_by_distance(p)[0] for p in [
        (-12.1, 0, 0),
    ]]
    chamfer(chafl_n6_edges, length=CHAFL_N6_SIZE)

    # Chaflán7
    chafl_n7_edges = [part.edges().sort_by_distance(p)[0] for p in [
        (11, 0, 5),
    ]]
    chamfer(chafl_n7_edges, length=CHAFL_N7_SIZE - 0.0001)  # a hair under: the kernel refuses the full size


solid = part.part
